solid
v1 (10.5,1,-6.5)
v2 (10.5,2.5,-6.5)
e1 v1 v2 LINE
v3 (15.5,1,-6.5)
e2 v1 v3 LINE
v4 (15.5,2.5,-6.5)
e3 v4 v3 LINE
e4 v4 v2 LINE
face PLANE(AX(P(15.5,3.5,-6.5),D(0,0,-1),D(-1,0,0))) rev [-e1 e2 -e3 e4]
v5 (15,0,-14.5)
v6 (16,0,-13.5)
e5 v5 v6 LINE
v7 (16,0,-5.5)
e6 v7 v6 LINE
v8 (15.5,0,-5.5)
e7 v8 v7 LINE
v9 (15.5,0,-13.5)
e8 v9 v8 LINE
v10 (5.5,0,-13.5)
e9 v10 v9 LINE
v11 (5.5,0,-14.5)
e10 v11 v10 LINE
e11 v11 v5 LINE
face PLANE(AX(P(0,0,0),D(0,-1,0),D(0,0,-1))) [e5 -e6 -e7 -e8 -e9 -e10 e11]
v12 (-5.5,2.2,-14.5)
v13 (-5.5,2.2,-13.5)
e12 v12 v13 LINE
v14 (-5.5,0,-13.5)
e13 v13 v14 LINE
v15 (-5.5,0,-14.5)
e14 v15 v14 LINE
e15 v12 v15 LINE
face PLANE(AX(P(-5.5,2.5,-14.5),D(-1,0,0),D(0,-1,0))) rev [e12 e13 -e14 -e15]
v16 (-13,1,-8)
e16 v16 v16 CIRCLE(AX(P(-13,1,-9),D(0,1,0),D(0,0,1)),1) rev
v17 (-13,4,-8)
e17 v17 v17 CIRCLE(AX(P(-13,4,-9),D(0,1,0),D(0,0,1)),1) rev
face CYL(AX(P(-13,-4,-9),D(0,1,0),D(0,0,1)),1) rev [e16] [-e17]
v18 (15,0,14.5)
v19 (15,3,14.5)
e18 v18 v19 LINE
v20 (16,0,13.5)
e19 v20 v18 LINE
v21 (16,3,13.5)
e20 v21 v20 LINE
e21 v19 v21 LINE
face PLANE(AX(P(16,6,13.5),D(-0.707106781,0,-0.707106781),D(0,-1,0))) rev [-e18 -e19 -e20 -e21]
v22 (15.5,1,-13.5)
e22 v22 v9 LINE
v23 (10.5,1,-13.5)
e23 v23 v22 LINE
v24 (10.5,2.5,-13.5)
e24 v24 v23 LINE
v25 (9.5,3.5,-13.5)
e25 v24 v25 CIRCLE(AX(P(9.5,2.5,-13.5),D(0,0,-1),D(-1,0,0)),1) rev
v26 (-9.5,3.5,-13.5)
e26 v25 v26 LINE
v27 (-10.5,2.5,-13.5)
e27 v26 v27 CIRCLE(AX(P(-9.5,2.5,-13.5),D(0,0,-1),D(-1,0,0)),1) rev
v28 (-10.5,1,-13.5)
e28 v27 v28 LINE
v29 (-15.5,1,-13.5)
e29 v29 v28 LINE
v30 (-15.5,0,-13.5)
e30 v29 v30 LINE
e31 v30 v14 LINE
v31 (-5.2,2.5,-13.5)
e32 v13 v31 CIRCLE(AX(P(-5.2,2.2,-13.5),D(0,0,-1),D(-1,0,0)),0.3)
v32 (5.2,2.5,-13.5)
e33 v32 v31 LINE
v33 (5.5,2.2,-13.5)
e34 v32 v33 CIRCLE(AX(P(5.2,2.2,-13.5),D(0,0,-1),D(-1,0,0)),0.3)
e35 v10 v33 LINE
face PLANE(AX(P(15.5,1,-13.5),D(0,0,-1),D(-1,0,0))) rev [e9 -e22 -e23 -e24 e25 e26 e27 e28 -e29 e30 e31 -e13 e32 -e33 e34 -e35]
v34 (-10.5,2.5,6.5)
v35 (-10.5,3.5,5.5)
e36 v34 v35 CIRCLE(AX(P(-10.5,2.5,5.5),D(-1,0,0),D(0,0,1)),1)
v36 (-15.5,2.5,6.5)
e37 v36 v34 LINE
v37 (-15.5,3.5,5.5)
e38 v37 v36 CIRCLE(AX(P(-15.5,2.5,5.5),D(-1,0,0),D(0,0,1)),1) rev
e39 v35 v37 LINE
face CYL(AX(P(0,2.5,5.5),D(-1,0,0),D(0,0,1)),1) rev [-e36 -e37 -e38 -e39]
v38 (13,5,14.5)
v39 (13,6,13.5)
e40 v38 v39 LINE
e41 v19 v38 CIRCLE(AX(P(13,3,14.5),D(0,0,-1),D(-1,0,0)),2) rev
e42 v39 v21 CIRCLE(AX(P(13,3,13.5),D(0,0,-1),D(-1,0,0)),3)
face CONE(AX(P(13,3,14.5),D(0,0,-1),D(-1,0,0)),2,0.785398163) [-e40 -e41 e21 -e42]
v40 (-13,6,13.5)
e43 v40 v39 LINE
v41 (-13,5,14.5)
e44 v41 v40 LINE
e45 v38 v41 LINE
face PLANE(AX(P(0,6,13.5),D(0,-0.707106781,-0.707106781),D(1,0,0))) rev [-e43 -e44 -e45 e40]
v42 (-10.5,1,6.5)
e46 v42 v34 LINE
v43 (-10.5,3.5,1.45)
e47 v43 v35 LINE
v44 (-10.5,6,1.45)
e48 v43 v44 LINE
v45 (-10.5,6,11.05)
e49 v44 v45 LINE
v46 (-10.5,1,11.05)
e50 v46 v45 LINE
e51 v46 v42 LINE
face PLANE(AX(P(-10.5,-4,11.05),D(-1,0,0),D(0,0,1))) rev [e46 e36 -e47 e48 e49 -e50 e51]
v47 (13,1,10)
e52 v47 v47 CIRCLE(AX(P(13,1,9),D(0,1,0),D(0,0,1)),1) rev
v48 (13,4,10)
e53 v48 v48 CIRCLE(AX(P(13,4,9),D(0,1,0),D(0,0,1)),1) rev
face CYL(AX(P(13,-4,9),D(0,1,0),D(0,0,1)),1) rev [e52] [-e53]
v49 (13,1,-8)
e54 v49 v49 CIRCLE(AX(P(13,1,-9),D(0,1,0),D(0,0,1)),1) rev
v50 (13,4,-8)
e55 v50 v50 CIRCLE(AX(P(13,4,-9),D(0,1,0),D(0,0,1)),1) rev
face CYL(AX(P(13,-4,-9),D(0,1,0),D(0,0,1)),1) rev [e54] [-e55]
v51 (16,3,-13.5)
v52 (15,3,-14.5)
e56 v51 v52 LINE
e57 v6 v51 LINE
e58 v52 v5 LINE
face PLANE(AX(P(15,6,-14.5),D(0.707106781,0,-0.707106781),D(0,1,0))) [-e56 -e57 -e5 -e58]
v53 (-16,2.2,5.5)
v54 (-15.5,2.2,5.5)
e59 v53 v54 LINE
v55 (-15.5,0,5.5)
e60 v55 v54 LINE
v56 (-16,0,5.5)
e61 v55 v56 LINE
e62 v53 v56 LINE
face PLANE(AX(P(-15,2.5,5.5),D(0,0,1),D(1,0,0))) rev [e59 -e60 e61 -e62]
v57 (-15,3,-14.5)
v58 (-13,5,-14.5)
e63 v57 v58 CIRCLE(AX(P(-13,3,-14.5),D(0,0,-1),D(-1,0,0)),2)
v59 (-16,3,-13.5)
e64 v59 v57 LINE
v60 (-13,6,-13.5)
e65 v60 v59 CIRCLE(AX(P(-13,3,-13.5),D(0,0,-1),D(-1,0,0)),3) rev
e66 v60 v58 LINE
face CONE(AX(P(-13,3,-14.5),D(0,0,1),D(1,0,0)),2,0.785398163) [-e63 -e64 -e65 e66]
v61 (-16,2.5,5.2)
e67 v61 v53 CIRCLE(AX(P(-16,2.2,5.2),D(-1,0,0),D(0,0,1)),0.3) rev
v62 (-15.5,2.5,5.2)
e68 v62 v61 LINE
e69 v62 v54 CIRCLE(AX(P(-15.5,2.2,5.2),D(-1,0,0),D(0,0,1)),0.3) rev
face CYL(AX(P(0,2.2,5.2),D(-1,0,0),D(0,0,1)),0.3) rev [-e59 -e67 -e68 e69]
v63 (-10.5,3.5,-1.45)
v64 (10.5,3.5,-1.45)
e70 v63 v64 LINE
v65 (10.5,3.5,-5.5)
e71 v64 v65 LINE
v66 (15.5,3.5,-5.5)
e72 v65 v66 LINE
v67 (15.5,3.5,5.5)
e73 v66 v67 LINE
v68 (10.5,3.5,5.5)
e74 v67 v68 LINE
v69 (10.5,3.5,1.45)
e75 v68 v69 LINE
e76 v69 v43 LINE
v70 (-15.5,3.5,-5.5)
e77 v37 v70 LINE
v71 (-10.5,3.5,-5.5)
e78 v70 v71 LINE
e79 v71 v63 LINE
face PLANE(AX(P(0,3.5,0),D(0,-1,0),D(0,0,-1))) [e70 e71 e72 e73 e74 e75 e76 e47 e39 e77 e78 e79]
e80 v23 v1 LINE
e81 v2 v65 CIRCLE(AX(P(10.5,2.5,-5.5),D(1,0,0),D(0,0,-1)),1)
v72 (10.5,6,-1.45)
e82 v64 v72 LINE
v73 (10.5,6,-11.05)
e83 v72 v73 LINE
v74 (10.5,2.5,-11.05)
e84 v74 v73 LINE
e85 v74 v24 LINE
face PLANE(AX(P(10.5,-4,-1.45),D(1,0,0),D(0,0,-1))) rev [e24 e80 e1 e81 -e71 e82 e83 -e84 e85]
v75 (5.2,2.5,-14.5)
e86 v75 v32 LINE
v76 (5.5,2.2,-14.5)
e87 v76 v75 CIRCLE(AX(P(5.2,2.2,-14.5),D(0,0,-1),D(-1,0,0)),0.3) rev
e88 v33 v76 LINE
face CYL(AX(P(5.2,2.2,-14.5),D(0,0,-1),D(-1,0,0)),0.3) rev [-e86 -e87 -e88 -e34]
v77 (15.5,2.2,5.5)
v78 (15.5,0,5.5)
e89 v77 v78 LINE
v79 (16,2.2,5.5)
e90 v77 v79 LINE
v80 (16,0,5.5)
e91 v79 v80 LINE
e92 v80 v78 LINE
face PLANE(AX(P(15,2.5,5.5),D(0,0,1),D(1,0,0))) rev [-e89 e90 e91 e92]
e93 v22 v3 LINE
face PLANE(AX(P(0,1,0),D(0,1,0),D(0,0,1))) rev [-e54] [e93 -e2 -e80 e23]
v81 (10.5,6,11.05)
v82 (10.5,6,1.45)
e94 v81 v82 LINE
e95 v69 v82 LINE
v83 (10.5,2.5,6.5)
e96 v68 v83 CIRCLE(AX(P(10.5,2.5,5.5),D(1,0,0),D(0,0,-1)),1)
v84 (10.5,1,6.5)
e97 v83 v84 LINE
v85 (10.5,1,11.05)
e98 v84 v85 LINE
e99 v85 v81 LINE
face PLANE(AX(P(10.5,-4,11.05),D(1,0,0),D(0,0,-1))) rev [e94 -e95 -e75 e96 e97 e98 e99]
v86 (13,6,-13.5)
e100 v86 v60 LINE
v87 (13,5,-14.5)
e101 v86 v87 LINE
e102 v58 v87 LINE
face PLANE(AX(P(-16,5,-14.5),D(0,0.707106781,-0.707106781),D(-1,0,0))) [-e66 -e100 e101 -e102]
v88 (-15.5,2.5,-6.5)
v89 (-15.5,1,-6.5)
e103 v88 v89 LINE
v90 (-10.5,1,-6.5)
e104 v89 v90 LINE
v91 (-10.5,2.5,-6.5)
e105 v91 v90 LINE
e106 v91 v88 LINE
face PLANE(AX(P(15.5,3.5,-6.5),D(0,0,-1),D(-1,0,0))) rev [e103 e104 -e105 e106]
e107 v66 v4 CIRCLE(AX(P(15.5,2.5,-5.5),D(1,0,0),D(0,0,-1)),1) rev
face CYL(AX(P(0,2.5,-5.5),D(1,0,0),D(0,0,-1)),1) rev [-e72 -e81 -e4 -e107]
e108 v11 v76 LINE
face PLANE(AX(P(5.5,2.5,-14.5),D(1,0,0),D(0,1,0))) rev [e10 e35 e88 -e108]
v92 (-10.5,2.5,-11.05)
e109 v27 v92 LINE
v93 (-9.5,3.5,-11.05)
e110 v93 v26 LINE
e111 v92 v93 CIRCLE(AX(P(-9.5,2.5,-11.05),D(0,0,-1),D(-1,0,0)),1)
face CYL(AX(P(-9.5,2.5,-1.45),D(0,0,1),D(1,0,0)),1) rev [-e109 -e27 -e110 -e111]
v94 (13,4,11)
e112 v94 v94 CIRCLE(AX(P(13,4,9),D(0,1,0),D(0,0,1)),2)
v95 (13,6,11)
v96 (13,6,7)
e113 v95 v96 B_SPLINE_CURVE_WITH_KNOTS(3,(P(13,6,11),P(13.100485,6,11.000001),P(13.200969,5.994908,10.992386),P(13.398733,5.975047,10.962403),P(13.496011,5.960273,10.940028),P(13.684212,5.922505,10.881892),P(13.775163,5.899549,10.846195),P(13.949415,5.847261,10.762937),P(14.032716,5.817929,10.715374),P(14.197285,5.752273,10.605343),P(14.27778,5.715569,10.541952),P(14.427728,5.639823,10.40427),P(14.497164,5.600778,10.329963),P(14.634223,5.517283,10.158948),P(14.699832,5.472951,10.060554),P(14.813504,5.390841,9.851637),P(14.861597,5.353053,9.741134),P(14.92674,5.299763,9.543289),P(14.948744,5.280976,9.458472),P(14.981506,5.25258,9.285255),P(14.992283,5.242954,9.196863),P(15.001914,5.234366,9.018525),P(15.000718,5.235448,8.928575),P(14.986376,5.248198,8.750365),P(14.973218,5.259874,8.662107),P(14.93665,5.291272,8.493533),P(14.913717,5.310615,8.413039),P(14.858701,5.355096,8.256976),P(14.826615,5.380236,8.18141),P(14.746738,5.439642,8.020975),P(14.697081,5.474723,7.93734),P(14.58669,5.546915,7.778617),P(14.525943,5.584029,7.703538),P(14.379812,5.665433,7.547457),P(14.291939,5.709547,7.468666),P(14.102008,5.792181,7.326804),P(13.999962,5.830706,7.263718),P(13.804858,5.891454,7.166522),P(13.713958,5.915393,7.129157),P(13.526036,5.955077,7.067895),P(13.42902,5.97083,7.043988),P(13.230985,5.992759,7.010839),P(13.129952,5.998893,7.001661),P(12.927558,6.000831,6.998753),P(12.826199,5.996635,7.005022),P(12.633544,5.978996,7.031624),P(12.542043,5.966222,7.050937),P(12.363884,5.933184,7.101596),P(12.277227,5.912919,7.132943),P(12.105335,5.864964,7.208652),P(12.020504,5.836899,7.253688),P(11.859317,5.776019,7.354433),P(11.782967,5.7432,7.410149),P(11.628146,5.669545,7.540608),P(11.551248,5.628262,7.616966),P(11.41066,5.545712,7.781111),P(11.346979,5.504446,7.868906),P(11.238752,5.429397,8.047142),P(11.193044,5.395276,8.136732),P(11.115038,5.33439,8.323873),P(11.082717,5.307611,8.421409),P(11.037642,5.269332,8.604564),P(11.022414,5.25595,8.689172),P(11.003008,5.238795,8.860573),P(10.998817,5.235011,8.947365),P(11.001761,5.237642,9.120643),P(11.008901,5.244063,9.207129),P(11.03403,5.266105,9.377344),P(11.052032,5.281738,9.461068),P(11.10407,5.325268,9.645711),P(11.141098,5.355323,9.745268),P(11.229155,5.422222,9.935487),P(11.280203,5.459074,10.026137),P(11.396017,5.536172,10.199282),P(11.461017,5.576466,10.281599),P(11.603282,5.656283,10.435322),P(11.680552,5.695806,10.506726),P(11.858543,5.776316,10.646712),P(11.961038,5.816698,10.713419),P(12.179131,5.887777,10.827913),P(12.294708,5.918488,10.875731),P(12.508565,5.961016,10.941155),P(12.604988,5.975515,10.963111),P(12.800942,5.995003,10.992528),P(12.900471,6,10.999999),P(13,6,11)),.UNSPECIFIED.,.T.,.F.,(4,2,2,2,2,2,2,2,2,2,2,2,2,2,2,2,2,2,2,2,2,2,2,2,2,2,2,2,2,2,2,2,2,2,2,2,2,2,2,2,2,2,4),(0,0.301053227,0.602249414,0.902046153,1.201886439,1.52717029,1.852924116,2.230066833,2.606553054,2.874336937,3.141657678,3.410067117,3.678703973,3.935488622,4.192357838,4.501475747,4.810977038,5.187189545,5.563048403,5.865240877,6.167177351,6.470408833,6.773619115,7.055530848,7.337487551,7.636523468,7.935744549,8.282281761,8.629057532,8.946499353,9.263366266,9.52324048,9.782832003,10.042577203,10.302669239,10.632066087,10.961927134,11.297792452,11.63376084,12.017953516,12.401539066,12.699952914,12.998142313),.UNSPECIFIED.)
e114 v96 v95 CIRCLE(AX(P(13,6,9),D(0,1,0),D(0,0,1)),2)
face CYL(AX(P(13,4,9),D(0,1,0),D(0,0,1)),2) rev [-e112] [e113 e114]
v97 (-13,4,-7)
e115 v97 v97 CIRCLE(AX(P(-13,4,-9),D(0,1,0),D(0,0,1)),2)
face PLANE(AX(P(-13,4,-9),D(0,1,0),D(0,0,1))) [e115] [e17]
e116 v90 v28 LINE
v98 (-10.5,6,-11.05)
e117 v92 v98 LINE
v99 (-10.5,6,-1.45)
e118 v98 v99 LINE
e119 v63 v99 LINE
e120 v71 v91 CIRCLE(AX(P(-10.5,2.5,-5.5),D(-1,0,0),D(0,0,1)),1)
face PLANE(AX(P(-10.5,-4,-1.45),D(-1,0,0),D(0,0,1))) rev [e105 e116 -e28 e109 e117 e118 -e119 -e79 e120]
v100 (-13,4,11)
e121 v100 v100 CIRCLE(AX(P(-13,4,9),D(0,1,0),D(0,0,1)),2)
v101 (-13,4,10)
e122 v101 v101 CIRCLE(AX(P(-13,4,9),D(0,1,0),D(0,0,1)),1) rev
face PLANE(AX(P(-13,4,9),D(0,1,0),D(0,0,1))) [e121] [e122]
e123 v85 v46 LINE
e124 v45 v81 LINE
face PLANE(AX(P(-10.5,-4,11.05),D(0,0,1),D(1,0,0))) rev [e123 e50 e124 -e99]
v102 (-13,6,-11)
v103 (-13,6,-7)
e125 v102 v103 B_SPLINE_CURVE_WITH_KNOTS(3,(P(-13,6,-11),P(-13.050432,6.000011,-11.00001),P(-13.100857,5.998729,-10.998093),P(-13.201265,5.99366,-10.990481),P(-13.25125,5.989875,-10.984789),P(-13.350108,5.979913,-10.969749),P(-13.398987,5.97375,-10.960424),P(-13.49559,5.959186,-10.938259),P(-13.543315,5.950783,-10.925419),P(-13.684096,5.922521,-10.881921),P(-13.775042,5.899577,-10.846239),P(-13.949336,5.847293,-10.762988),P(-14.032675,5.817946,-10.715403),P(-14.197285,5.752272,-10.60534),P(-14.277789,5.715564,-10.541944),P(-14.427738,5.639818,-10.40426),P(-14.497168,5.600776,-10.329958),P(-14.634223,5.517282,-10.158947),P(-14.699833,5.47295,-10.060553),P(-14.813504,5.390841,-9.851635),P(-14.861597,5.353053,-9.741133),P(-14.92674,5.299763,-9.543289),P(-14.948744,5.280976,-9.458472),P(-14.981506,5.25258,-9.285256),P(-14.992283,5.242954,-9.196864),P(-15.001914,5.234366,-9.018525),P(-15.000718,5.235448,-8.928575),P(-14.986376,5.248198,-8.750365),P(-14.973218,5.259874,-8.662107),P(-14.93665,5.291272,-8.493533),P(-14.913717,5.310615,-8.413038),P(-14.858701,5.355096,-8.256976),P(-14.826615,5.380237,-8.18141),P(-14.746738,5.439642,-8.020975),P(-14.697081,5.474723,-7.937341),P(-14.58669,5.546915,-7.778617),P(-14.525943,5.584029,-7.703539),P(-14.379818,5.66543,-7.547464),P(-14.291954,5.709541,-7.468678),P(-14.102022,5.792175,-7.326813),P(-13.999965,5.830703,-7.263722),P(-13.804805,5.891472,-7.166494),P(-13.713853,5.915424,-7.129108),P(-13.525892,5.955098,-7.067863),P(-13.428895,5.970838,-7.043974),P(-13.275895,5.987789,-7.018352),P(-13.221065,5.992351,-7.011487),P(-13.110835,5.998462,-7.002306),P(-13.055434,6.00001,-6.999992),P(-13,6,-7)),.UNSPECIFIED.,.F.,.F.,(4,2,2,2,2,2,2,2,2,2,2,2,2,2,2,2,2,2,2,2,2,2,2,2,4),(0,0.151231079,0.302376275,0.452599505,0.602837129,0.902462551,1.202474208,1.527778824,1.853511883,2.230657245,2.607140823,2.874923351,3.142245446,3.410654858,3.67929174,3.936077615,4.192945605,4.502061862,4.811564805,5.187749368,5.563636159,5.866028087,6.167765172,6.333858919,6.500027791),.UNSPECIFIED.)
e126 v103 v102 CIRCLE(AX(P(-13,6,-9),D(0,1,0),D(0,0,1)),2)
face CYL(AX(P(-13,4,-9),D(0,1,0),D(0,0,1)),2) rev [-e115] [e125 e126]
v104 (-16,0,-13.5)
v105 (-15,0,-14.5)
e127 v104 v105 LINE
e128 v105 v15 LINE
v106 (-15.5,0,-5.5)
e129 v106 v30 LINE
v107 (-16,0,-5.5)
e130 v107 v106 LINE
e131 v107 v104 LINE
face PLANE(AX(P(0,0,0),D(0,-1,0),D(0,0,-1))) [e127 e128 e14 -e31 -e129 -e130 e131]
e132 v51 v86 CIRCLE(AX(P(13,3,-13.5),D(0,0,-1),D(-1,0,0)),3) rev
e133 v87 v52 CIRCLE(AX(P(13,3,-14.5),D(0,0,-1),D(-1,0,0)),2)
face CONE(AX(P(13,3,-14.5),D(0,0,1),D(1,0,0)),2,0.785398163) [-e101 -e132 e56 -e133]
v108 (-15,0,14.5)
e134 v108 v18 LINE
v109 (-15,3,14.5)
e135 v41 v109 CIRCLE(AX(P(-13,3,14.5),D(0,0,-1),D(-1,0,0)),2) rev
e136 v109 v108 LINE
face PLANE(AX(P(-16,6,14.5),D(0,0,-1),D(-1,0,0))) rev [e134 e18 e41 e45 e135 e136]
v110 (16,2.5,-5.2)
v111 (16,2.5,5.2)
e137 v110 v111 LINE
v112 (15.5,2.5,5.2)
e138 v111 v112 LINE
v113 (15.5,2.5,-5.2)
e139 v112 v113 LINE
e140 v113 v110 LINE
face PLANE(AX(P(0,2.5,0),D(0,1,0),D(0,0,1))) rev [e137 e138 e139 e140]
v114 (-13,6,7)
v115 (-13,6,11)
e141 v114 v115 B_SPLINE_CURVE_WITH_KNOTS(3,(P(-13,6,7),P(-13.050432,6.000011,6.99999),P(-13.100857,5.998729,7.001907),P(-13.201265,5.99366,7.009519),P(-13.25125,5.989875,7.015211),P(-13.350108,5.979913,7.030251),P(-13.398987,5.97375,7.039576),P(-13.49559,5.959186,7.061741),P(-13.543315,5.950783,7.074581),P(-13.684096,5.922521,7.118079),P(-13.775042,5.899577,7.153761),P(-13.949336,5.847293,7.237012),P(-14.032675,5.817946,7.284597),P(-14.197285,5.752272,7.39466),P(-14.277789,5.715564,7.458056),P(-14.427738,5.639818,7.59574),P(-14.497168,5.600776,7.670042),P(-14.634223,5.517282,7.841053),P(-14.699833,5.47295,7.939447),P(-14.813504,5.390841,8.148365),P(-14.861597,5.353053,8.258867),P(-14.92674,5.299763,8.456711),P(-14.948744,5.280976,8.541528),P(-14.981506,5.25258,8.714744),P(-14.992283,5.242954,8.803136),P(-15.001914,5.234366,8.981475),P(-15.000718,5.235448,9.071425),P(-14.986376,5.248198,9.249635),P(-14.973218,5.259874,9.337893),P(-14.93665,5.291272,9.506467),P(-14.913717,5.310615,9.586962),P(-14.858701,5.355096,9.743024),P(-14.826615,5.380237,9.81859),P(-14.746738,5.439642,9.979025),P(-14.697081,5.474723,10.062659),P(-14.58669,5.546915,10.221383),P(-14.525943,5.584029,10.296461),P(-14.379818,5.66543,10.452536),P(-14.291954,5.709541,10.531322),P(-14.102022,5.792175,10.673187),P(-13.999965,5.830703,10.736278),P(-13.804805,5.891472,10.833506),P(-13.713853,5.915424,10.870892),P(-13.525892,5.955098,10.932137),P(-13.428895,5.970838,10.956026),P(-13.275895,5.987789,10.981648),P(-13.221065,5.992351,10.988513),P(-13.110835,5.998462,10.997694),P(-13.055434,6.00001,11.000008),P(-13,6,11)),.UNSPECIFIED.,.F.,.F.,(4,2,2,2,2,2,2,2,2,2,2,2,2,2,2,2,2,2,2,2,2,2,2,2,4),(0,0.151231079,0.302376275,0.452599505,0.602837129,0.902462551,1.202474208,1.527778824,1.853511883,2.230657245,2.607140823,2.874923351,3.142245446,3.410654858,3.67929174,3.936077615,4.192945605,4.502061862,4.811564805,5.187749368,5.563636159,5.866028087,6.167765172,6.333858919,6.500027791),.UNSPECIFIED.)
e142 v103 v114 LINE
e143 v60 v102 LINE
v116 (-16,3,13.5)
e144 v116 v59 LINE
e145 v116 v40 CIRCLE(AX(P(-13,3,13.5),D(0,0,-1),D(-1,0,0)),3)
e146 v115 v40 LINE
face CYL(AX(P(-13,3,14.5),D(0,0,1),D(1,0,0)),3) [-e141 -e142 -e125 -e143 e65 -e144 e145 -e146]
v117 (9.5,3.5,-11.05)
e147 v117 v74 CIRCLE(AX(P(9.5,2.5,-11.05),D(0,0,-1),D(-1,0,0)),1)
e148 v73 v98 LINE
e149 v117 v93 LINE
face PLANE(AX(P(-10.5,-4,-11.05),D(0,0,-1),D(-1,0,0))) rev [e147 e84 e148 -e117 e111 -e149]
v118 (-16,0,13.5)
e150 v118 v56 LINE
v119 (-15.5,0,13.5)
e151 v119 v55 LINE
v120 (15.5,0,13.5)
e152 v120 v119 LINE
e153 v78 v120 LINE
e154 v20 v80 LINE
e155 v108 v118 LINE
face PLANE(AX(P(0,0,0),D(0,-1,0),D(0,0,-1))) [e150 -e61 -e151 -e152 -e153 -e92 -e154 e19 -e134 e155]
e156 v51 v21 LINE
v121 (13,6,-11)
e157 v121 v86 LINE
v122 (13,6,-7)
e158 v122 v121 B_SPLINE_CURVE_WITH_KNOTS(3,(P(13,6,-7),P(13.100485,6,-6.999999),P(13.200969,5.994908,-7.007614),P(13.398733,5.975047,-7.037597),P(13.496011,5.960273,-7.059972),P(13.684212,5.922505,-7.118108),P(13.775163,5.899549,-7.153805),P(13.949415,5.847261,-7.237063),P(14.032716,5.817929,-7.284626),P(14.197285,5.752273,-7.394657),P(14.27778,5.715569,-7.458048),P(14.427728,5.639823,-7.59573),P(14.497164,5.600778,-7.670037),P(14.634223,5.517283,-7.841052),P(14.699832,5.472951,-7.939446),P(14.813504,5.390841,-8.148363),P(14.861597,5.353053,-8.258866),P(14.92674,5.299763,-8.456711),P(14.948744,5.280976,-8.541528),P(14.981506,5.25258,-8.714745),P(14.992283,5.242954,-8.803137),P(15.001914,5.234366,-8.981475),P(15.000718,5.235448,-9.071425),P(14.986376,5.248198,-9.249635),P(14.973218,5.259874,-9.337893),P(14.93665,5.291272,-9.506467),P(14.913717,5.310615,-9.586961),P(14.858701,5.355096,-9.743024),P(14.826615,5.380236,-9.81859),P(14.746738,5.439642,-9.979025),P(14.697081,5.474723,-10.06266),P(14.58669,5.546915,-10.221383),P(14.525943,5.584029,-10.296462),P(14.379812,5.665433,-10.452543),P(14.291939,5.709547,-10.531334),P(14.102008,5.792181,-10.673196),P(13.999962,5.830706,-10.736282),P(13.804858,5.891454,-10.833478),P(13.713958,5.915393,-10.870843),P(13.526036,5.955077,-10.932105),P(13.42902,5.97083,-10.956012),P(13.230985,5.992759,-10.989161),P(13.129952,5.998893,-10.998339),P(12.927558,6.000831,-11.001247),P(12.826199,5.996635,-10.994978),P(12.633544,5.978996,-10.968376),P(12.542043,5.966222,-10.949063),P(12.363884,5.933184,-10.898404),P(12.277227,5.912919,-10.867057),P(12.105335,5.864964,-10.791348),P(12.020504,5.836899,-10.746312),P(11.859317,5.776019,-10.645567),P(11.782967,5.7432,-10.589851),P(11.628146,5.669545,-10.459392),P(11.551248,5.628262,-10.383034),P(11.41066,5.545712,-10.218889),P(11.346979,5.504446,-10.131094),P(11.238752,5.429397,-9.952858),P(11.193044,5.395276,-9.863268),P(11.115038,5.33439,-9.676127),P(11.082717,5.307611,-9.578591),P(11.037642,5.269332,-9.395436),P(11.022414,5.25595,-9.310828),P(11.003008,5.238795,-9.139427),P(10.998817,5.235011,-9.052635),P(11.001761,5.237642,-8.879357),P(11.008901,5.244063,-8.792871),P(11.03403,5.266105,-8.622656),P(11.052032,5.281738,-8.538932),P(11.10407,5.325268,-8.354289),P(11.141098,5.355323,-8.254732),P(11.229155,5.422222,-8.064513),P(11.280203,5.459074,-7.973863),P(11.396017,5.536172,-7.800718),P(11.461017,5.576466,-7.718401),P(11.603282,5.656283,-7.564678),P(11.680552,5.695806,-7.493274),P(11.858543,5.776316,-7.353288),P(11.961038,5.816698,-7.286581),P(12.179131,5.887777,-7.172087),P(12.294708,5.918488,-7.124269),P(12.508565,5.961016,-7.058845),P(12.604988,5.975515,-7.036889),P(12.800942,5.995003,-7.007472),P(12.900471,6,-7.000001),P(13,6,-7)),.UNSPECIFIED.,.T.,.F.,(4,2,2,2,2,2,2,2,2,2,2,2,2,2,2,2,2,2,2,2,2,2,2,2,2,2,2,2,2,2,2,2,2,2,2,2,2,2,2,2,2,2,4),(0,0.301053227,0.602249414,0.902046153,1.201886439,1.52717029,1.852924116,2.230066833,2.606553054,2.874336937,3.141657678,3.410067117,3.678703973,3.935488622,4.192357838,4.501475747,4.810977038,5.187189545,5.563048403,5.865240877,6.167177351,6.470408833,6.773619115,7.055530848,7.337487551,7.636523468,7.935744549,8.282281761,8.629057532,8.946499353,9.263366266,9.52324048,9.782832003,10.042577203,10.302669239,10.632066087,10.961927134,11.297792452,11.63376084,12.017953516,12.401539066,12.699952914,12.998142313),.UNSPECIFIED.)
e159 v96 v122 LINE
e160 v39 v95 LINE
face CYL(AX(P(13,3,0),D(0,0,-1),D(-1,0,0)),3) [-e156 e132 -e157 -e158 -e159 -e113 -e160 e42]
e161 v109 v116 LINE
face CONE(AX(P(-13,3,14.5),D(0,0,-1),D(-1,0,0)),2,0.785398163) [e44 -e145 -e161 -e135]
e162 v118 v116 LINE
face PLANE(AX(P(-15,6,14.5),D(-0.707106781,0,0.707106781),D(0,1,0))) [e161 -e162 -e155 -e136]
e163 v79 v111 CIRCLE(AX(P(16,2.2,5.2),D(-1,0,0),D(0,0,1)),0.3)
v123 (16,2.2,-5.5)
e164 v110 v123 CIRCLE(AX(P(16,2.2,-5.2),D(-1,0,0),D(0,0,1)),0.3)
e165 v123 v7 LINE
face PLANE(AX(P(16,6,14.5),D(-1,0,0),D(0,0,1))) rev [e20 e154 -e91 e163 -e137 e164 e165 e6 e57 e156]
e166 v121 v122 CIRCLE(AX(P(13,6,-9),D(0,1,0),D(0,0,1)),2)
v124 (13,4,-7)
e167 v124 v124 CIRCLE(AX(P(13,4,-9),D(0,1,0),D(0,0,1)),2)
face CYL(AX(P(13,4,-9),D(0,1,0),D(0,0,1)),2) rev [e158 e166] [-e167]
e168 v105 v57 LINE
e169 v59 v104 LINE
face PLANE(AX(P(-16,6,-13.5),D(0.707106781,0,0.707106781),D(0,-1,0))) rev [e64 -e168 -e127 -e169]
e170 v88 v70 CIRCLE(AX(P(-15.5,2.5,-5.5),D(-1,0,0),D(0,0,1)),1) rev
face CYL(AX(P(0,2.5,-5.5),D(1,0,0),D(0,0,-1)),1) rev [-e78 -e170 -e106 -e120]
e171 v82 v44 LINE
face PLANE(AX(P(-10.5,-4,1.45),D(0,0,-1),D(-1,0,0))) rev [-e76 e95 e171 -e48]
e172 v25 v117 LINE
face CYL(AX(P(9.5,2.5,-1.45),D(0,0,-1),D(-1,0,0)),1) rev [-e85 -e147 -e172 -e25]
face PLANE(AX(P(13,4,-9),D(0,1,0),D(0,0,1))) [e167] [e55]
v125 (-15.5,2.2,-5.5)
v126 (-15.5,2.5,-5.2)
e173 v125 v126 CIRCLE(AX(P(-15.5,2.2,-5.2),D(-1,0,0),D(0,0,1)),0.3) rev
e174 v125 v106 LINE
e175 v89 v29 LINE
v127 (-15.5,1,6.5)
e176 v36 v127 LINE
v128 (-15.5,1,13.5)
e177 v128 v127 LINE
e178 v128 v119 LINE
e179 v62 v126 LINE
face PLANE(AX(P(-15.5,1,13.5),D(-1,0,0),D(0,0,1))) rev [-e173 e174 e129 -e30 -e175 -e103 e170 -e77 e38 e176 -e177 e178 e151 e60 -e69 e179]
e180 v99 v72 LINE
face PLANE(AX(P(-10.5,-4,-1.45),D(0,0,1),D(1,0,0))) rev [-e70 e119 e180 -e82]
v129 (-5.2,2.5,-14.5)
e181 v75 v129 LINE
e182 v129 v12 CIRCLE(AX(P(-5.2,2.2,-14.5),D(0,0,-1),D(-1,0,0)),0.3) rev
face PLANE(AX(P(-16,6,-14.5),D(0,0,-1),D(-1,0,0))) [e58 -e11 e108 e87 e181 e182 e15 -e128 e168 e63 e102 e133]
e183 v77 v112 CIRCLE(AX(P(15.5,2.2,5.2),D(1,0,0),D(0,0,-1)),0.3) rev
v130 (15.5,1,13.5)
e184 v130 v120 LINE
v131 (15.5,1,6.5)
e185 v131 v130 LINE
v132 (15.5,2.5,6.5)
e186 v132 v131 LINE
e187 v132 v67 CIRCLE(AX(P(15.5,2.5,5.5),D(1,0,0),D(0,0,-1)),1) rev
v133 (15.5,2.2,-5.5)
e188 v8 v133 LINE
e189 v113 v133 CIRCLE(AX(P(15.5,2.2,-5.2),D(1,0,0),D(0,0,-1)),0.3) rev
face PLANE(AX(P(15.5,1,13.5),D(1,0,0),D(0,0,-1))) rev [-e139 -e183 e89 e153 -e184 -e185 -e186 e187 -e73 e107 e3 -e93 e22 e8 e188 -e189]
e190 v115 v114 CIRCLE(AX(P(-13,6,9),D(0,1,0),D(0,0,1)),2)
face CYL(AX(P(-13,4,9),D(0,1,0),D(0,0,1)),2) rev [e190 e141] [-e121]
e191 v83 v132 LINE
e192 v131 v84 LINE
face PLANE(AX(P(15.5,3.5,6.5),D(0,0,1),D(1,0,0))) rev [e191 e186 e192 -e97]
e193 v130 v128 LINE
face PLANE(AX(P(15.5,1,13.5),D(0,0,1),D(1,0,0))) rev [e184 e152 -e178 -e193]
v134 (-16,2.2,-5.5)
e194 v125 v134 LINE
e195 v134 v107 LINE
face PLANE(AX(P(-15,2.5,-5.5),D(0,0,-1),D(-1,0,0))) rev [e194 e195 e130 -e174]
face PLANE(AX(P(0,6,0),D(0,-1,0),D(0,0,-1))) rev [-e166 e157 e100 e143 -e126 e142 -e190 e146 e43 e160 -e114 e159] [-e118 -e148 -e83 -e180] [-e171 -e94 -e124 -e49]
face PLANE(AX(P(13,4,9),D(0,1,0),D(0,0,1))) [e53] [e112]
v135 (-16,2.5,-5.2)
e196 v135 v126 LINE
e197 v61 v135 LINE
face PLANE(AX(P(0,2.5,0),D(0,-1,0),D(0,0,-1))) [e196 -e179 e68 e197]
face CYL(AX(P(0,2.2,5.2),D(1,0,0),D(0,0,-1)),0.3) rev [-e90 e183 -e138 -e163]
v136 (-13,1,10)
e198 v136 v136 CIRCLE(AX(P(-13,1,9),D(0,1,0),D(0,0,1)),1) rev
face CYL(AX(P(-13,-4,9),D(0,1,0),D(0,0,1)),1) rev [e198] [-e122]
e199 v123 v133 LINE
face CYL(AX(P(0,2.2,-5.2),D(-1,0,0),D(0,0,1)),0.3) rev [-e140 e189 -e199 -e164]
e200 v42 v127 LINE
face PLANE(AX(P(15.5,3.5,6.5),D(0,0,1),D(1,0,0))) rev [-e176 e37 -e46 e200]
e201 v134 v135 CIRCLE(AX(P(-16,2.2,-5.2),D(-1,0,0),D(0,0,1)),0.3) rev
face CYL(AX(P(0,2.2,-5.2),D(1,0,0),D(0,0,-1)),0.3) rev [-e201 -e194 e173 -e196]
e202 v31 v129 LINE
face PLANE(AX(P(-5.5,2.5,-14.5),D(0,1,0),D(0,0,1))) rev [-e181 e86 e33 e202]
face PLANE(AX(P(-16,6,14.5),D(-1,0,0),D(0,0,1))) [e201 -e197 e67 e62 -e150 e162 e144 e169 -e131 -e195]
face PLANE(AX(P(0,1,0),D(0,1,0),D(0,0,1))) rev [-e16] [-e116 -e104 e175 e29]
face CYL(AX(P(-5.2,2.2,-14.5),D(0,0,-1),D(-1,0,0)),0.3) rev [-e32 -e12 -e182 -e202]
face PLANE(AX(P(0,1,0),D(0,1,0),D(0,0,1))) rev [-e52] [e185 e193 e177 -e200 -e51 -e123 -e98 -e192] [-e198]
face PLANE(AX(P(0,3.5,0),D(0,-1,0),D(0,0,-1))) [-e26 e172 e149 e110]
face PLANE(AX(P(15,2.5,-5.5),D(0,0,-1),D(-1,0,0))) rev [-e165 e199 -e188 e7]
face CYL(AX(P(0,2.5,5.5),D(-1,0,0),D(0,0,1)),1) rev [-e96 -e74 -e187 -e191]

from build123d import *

# Parameters (mm, degrees)
SKETCH1_W           = 32
SKETCH1_H           = 29
BOSS_EXTRUDE1_DEPTH = 6
SKETCH2_R           = 1
CUT_EXTRUDE1_DEPTH  = 10
SKETCH3_W           = 21
SKETCH3_H           = 9.6
CUT_EXTRUDE2_DEPTH  = 10
SKETCH4_W           = 31
SKETCH4_H           = 27
CUT_EXTRUDE3_DEPTH  = 1
FILLET2_R           = 3
SKETCH5_R           = 2
CUT_EXTRUDE4_DEPTH  = 2
CHAMFER2_SIZE       = 1
SKETCH6_W           = 1
SKETCH6_H           = 11
CUT_EXTRUDE5_DEPTH  = 2.5
FILLET3_R           = 0.3
SKETCH7_W           = 31
SKETCH7_H           = 13
CUT_EXTRUDE6_DEPTH  = 2.5
FILLET4_R           = 1
SKETCH_1_W          = 21
SKETCH_1_H          = 12.05
CUT_EXTRUDE_1_DEPTH = 2.5
FILLET_1_R          = 1
SKETCH_2_W          = 11
SKETCH_2_H          = 2.5
CUT_EXTRUDE_2_DEPTH = 33.802439001
FILLET_2_R          = 0.3


with BuildPart() as part:
    # Sketch1 → Boss-Extrude1 (new body)
    with BuildSketch(Plane(origin=(0, 0, 0), x_dir=(1, 0, 0), z_dir=(0, 1, 0))):
        Rectangle(SKETCH1_W, SKETCH1_H)
    extrude(amount=BOSS_EXTRUDE1_DEPTH)

    # Sketch2 → Cut-Extrude1 (cut)
    with BuildSketch(Plane(origin=(0, 6, 0), x_dir=(1, 0, 0), z_dir=(0, 1, 0))):
        with Locations(Location((-13, 9, 0), (0, 0, 270))):
            Circle(SKETCH2_R)
        with Locations(Location((13, 9, 0), (0, 0, 270))):
            Circle(SKETCH2_R)
        with Locations(Location((13, -9, 0), (0, 0, 270))):
            Circle(SKETCH2_R)
        with Locations(Location((-13, -9, 0), (0, 0, 270))):
            Circle(SKETCH2_R)
    extrude(amount=-CUT_EXTRUDE1_DEPTH, mode=Mode.SUBTRACT)

    # Sketch3 → Cut-Extrude2 (cut)
    with BuildSketch(Plane(origin=(0, 6, 0), x_dir=(1, 0, 0), z_dir=(0, 1, 0))):
        with Locations((0, 6.25)):
            Rectangle(SKETCH3_W, SKETCH3_H)
        with Locations((0, -6.25)):
            Rectangle(SKETCH3_W, SKETCH3_H)
    extrude(amount=-CUT_EXTRUDE2_DEPTH, mode=Mode.SUBTRACT)

    # Sketch4 → Cut-Extrude3 (cut)
    with BuildSketch(Plane.XZ):
        Rectangle(SKETCH4_W, SKETCH4_H)
    extrude(amount=-CUT_EXTRUDE3_DEPTH, mode=Mode.SUBTRACT)

    # Fillet2
    # the kernel refuses this fillet: 3 mm, written as the material it takes off along each edge
    with BuildSketch(Plane(origin=(16, 6, 22), x_dir=(0, -1, 0), z_dir=(0, 0, -1)), Plane(origin=(-16, 6, -22), x_dir=(0, -1, 0), z_dir=(0, 0, 1))) as fillet2_piece_1:
        with BuildLine():
            CenterArc((FILLET2_R, FILLET2_R), FILLET2_R, 180, 90)
            Line((0, FILLET2_R), (0, 0))
            Line((0, 0), (FILLET2_R, 0))
        make_face()
    extrude(amount=44, mode=Mode.SUBTRACT)

    # Sketch5 → Cut-Extrude4 (cut)
    with BuildSketch(Plane(origin=(0, 6, 0), x_dir=(1, 0, 0), z_dir=(0, 1, 0))):
        with Locations(Location((-13, 9, 0), (0, 0, 270))):
            Circle(SKETCH5_R)
        with Locations(Location((13, 9, 0), (0, 0, 270))):
            Circle(SKETCH5_R)
        with Locations(Location((13, -9, 0), (0, 0, 270))):
            Circle(SKETCH5_R)
        with Locations(Location((-13, -9, 0), (0, 0, 270))):
            Circle(SKETCH5_R)
    extrude(amount=-CUT_EXTRUDE4_DEPTH, mode=Mode.SUBTRACT)

    # Chamfer2
    chamfer2_edges = [part.edges().sort_by_distance(p)[0] for p in [
        (-16, 1.5, 14.5),
        (-16, 1.5, -14.5),
        (0, 6, -14.5),
        (16, 1.5, -14.5),
        (15.121320344, 5.121320344, -14.5),
        (-15.121320344, 5.121320344, -14.5),
        (0, 6, 14.5),
        (16, 1.5, 14.5),
        (15.121320344, 5.121320344, 14.5),
        (-15.121320344, 5.121320344, 14.5),
    ]]
    chamfer(chamfer2_edges, length=CHAMFER2_SIZE)

    # Sketch6 → Cut-Extrude5 (cut)
    with BuildSketch(Plane.XZ):
        with Locations((-15.5, 0)):
            Rectangle(SKETCH6_W, SKETCH6_H)
        with Locations((15.5, 0)):
            Rectangle(SKETCH6_W, SKETCH6_H)
    extrude(amount=-CUT_EXTRUDE5_DEPTH, mode=Mode.SUBTRACT)

    # Fillet3
    fillet3_edges = [part.edges().sort_by_distance(p)[0] for p in [
        (-15.5, 2.5, 5.5),
        (-15.5, 2.5, -5.5),
        (15.5, 2.5, -5.5),
        (15.5, 2.5, 5.5),
    ]]
    fillet(fillet3_edges, radius=FILLET3_R)

    # Sketch7 → Cut-Extrude6 (cut)
    with BuildSketch(Plane.XZ.offset(-1)):
        Rectangle(SKETCH7_W, SKETCH7_H)
    extrude(amount=-CUT_EXTRUDE6_DEPTH, mode=Mode.SUBTRACT)

    # Fillet4
    fillet4_edges = [part.edges().sort_by_distance(p)[0] for p in [
        (-13, 3.5, 6.5),
        (13, 3.5, 6.5),
        (-13, 3.5, -6.5),
        (13, 3.5, -6.5),
    ]]
    fillet(fillet4_edges, radius=FILLET4_R)

    # Эскиз1 → Вырез-Вытянуть1 (cut)
    with BuildSketch(Plane.XZ.offset(-1)):
        with Locations((0, -7.475)):
            Rectangle(SKETCH_1_W, SKETCH_1_H)
    extrude(amount=-CUT_EXTRUDE_1_DEPTH, mode=Mode.SUBTRACT)

    # Скругление1
    fillet_1_edges = [part.edges().sort_by_distance(p)[0] for p in [
        (10.5, 3.5, -12.275),
        (-10.5, 3.5, -12.275),
    ]]
    fillet(fillet_1_edges, radius=FILLET_1_R)

    # Эскиз2 → Вырез-Вытянуть2 (cut, through all)
    with BuildSketch(Plane.XY.offset(-13.5)):
        with Locations((0, 1.25)):
            Rectangle(SKETCH_2_W, SKETCH_2_H)
    extrude(amount=-CUT_EXTRUDE_2_DEPTH, mode=Mode.SUBTRACT)

    # Скругление2
    fillet_2_edges = [part.edges().sort_by_distance(p)[0] for p in [
        (5.5, 2.5, -14),
        (-5.5, 2.5, -14),
    ]]
    fillet(fillet_2_edges, radius=FILLET_2_R)


solid = part.part
